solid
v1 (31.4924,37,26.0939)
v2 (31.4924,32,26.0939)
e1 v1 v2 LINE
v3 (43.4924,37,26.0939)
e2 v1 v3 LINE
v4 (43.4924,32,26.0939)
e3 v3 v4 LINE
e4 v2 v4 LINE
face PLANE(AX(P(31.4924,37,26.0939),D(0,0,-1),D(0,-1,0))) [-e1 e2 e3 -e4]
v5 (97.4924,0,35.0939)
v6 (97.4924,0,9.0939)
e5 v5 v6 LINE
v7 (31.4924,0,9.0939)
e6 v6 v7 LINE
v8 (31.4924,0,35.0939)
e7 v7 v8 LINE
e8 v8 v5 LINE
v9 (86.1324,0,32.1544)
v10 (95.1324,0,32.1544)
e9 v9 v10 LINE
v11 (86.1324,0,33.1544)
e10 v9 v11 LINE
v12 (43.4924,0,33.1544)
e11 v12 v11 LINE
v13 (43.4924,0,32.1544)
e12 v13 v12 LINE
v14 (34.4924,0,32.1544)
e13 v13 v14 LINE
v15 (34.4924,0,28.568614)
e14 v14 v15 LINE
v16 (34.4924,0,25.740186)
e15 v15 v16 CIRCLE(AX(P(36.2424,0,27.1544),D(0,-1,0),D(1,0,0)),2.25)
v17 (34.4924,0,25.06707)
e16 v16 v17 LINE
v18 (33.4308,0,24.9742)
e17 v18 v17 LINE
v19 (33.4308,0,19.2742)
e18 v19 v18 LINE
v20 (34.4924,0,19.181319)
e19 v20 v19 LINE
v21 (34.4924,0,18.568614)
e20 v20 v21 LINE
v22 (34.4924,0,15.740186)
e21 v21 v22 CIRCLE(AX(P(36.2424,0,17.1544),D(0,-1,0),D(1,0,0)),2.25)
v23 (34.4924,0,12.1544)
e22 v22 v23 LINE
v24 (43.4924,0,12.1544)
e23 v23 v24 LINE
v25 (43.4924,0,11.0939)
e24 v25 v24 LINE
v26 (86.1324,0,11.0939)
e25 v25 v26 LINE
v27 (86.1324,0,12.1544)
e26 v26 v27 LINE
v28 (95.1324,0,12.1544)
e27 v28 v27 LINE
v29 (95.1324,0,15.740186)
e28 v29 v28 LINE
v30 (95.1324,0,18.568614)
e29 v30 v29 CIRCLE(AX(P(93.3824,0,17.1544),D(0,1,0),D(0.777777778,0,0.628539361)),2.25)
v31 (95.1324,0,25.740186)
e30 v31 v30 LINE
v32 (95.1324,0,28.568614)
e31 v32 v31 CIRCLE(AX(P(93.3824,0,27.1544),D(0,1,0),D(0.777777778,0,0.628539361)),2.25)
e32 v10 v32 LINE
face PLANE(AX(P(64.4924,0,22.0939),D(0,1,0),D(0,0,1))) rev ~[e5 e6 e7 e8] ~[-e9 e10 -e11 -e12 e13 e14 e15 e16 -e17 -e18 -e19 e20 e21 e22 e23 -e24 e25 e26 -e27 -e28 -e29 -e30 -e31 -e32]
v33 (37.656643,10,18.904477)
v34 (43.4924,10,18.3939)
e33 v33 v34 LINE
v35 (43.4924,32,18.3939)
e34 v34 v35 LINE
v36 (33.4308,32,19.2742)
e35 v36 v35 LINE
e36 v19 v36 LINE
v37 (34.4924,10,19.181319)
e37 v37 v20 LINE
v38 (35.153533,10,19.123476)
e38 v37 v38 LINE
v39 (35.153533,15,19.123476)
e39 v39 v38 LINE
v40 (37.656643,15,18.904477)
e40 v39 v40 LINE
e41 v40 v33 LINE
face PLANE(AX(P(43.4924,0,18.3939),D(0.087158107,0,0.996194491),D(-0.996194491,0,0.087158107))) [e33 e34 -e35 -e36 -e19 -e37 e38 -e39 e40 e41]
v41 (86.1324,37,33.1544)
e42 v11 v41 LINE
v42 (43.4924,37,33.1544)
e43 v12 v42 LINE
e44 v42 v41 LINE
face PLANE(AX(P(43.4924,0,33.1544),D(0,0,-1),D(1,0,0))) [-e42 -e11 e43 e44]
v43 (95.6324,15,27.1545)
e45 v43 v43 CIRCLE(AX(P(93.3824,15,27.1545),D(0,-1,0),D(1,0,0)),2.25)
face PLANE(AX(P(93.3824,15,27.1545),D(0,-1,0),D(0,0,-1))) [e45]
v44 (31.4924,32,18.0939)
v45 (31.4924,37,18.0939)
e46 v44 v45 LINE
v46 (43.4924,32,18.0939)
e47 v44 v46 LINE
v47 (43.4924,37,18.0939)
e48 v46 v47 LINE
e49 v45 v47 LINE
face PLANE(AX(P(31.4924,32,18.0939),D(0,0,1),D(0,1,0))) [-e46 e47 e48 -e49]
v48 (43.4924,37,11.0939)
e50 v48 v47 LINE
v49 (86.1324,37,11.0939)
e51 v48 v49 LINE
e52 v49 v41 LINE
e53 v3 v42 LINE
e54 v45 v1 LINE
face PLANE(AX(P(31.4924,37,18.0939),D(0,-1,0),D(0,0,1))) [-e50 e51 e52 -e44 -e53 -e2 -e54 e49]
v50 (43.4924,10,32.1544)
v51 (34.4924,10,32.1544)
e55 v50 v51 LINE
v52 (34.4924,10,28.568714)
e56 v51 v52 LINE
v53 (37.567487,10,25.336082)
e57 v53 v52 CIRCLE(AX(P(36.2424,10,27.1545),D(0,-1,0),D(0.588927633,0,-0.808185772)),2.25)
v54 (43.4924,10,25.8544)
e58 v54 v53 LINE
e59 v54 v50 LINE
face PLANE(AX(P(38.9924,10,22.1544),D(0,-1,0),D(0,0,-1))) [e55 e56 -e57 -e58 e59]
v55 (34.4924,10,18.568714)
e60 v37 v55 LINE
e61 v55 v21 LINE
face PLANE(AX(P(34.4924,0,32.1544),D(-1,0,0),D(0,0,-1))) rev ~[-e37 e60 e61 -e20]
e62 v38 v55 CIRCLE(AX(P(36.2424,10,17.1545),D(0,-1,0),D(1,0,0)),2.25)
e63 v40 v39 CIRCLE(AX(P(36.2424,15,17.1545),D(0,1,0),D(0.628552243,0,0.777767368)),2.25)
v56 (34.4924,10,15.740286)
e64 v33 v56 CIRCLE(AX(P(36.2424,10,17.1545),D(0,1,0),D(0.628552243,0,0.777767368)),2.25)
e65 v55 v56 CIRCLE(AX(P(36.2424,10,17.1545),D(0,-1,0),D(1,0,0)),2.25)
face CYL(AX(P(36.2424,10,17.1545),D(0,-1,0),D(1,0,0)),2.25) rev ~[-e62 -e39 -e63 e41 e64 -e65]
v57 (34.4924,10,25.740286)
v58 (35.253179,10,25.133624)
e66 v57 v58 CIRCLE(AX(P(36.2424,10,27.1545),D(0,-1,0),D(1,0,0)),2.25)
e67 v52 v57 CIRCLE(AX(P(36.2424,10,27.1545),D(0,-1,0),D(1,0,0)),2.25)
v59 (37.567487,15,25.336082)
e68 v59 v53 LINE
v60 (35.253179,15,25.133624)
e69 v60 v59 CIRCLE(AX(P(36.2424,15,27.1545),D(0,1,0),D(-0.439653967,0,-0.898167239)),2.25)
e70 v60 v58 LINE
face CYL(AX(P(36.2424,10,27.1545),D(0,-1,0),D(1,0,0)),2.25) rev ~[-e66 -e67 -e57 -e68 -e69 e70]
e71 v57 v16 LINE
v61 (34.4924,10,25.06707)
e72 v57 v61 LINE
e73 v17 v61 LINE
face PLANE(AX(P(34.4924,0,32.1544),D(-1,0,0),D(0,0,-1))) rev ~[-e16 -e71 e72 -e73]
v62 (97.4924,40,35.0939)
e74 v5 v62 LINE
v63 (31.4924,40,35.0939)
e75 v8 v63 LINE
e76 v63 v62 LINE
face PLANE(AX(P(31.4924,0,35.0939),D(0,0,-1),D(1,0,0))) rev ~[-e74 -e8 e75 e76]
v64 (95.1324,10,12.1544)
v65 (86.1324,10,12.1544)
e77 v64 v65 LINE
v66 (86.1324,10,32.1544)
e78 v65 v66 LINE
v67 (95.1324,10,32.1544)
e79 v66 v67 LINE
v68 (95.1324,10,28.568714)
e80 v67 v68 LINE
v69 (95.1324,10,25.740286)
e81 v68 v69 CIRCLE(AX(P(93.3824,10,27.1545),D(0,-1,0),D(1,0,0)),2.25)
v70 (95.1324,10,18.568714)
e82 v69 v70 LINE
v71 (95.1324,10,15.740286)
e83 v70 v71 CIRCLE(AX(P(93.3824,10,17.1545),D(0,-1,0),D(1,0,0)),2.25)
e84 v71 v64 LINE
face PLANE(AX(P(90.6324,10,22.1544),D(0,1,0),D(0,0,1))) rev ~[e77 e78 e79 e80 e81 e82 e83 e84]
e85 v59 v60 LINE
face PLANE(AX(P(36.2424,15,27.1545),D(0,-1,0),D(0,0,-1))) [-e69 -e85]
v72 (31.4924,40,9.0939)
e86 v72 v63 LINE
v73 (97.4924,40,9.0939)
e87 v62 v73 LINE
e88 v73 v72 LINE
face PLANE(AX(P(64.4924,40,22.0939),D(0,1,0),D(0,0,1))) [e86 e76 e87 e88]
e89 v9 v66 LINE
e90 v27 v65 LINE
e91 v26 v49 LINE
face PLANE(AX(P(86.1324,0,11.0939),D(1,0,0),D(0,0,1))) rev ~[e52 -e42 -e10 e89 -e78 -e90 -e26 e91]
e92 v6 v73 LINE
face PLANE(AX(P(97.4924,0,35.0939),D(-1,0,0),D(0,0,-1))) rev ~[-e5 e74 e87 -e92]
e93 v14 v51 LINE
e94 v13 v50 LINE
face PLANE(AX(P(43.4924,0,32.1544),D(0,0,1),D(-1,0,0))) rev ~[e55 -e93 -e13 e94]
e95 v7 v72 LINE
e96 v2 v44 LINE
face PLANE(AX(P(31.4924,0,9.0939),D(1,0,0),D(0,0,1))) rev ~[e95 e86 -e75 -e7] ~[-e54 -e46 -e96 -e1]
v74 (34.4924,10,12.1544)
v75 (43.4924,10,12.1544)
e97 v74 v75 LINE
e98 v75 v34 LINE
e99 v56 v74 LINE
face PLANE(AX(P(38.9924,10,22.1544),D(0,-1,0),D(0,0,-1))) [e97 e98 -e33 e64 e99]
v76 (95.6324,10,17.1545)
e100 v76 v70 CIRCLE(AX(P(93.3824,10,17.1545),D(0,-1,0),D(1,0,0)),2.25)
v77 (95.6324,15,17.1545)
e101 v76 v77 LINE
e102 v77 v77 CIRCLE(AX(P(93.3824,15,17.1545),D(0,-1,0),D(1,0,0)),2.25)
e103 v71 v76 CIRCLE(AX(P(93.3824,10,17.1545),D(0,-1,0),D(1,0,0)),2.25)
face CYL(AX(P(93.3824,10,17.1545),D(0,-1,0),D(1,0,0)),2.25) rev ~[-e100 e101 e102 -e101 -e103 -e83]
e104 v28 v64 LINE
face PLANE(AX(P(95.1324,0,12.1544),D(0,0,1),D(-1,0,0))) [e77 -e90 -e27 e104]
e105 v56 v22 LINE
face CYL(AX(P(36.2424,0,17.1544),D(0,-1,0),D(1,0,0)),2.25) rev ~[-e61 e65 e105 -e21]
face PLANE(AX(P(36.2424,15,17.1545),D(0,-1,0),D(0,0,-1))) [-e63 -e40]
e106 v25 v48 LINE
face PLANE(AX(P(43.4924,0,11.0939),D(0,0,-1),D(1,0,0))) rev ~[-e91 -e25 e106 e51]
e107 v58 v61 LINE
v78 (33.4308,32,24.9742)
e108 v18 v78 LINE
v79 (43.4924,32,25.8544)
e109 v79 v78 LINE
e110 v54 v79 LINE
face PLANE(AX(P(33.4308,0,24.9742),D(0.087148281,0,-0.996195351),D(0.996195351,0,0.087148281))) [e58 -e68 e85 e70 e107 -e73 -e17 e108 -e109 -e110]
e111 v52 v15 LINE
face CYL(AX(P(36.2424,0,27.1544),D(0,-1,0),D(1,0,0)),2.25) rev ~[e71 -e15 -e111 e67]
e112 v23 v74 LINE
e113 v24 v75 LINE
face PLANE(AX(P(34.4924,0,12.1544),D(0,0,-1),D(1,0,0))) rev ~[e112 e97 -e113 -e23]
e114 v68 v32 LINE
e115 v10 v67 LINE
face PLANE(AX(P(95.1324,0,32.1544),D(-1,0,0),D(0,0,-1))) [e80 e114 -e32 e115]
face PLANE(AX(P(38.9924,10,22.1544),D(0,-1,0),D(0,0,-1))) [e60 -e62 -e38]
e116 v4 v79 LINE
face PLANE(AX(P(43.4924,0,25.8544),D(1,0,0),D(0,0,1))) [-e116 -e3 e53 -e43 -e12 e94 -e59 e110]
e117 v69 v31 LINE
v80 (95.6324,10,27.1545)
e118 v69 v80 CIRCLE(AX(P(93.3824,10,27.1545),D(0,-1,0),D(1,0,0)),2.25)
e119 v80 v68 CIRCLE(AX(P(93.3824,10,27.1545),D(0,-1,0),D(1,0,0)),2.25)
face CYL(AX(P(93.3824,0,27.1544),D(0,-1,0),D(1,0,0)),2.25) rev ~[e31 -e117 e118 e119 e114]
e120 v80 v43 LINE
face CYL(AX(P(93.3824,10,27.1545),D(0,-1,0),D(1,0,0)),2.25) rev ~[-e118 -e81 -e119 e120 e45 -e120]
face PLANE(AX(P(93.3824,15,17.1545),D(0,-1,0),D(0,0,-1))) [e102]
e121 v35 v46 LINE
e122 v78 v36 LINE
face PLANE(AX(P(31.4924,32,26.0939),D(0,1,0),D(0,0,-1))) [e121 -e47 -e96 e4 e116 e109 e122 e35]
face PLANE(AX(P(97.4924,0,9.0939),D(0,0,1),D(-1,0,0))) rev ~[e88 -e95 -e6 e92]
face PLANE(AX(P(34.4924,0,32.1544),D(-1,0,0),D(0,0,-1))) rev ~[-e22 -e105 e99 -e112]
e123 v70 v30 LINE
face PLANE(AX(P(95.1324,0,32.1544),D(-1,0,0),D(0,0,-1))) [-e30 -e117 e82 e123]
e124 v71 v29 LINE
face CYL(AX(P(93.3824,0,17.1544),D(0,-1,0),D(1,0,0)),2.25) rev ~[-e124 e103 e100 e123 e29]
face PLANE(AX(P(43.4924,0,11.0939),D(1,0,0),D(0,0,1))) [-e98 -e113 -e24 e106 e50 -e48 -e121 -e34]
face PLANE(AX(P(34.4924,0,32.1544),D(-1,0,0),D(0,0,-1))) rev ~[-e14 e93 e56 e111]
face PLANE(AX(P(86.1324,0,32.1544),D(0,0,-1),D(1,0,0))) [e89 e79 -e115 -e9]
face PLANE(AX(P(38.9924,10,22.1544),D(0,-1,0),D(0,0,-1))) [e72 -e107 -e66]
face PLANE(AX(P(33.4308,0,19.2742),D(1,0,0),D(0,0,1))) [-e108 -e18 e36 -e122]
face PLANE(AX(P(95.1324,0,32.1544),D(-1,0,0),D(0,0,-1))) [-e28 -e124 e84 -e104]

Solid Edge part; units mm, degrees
sketch "Sketch1" plane through (0, 0, 0) normal (0, -1, 0) x (1, 0, 0)
  line L0 (31.4924, 35.0939) -> (97.4924, 35.0939)
  line L1 (97.4924, 35.0939) -> (97.4924, 9.0939)
  line L2 (97.4924, 9.0939) -> (31.4924, 9.0939)
  line L3 (31.4924, 9.0939) -> (31.4924, 35.0939)
  dimension "D1" = 66
  dimension "D2" = 26
extrude "Protrusion1" add sketch "Sketch1" against normal blind 40
sketch "Sketch2" plane through (64.4924, 0, 22.0939) normal (0, -1, 0) x (1, 0, 0)
  line L0 (-31.0616, 2.8803) -> (-21, 3.7605)
  line L1 (-21, 3.7605) -> (-21, 11.0605)
  line L2 (-21, 11.0605) -> (21.64, 11.0605)
  line L3 (21.64, -11) -> (21.64, 11.0605)
  line L4 (-21, -11) -> (21.64, -11)
  line L5 (-21, -11) -> (-21, -3.7)
  line L6 (-21, -3.7) -> (-31.0616, -2.8197)
  line L7 (-31.0616, -2.8197) -> (-31.0616, 2.8803)
extrude "ExtrudedCutout_4" cut sketch "Sketch2" against normal blind 37
sketch "Sketch3" plane through (31.4924, 20, 22.0939) normal (-1, 0, 0) x (0, -1, 0)
  line L0 (-17, -4) -> (-17, 4)
  line L1 (-17, 4) -> (-12, 4)
  line L2 (-12, 4) -> (-12, -4)
  line L3 (-12, -4) -> (-17, -4)
  dimension "D1" = 8
  dimension "D2" = 5
  dimension "D3" = 8
  dimension "D4" = 3
  dimension "D5" = 9
extrude "Cutout1" cut sketch "Sketch3" against normal up to next
sketch "Sketch4" plane through (64.4924, 0, 22.0939) normal (0, -1, 0) x (1, 0, 0)
  line L0 (-21, 10.0605) -> (-30, 10.0605)
  line L1 (-30, 10.0605) -> (-30, -9.9395)
  line L2 (-30, -9.9395) -> (-21, -9.9395)
  line L3 (-21, -9.9395) -> (-21, 10.0605)
  line L4 (21.64, 10.0605) -> (30.64, 10.0605)
  line L5 (30.64, 10.0605) -> (30.64, -9.9395)
  line L6 (30.64, -9.9395) -> (21.64, -9.9395)
  line L7 (21.64, -9.9395) -> (21.64, 10.0605)
  dimension "D1" = 1
  dimension "D2" = 20
  dimension "D3" = 1
  dimension "D4" = 9
  dimension "D5" = 20
  dimension "D6" = 9
extrude "ExtrudedCutout_6" cut sketch "Sketch4" against normal blind 10
sketch "Sketch5" plane through (91.2324, 10, 21.645) normal (0, -1, 0) x (1, 0, 0)
  circle A0 centre (2.15, 5.5095) radius 2.25
  circle A1 centre (-54.99, 5.5095) radius 2.25
  circle A2 centre (-54.99, -4.4905) radius 2.25
  circle A3 centre (2.15, -4.4905) radius 2.25
  dimension "D1" = 7.25
  dimension "D2" = 4.5
  dimension "D3" = 7.25
  dimension "D4" = 10
  dimension "D5" = 5
  dimension "D6" = 10
  dimension "D7" = 5
extrude "ExtrudedCutout_7" cut sketch "Sketch5" against normal blind 5
sketch "Sketch6" plane through (64.4924, 0, 22.0939) normal (0, -1, 0) x (1, 0, 0)
  circle A0 centre (28.89, 5.0605) radius 2.25
  circle A1 centre (28.89, -4.9395) radius 2.25
  circle A2 centre (-28.25, 5.0605) radius 2.25
  circle A3 centre (-28.25, -4.9395) radius 2.25
extrude "Cutout2" cut sketch "Sketch6" against normal up to next
